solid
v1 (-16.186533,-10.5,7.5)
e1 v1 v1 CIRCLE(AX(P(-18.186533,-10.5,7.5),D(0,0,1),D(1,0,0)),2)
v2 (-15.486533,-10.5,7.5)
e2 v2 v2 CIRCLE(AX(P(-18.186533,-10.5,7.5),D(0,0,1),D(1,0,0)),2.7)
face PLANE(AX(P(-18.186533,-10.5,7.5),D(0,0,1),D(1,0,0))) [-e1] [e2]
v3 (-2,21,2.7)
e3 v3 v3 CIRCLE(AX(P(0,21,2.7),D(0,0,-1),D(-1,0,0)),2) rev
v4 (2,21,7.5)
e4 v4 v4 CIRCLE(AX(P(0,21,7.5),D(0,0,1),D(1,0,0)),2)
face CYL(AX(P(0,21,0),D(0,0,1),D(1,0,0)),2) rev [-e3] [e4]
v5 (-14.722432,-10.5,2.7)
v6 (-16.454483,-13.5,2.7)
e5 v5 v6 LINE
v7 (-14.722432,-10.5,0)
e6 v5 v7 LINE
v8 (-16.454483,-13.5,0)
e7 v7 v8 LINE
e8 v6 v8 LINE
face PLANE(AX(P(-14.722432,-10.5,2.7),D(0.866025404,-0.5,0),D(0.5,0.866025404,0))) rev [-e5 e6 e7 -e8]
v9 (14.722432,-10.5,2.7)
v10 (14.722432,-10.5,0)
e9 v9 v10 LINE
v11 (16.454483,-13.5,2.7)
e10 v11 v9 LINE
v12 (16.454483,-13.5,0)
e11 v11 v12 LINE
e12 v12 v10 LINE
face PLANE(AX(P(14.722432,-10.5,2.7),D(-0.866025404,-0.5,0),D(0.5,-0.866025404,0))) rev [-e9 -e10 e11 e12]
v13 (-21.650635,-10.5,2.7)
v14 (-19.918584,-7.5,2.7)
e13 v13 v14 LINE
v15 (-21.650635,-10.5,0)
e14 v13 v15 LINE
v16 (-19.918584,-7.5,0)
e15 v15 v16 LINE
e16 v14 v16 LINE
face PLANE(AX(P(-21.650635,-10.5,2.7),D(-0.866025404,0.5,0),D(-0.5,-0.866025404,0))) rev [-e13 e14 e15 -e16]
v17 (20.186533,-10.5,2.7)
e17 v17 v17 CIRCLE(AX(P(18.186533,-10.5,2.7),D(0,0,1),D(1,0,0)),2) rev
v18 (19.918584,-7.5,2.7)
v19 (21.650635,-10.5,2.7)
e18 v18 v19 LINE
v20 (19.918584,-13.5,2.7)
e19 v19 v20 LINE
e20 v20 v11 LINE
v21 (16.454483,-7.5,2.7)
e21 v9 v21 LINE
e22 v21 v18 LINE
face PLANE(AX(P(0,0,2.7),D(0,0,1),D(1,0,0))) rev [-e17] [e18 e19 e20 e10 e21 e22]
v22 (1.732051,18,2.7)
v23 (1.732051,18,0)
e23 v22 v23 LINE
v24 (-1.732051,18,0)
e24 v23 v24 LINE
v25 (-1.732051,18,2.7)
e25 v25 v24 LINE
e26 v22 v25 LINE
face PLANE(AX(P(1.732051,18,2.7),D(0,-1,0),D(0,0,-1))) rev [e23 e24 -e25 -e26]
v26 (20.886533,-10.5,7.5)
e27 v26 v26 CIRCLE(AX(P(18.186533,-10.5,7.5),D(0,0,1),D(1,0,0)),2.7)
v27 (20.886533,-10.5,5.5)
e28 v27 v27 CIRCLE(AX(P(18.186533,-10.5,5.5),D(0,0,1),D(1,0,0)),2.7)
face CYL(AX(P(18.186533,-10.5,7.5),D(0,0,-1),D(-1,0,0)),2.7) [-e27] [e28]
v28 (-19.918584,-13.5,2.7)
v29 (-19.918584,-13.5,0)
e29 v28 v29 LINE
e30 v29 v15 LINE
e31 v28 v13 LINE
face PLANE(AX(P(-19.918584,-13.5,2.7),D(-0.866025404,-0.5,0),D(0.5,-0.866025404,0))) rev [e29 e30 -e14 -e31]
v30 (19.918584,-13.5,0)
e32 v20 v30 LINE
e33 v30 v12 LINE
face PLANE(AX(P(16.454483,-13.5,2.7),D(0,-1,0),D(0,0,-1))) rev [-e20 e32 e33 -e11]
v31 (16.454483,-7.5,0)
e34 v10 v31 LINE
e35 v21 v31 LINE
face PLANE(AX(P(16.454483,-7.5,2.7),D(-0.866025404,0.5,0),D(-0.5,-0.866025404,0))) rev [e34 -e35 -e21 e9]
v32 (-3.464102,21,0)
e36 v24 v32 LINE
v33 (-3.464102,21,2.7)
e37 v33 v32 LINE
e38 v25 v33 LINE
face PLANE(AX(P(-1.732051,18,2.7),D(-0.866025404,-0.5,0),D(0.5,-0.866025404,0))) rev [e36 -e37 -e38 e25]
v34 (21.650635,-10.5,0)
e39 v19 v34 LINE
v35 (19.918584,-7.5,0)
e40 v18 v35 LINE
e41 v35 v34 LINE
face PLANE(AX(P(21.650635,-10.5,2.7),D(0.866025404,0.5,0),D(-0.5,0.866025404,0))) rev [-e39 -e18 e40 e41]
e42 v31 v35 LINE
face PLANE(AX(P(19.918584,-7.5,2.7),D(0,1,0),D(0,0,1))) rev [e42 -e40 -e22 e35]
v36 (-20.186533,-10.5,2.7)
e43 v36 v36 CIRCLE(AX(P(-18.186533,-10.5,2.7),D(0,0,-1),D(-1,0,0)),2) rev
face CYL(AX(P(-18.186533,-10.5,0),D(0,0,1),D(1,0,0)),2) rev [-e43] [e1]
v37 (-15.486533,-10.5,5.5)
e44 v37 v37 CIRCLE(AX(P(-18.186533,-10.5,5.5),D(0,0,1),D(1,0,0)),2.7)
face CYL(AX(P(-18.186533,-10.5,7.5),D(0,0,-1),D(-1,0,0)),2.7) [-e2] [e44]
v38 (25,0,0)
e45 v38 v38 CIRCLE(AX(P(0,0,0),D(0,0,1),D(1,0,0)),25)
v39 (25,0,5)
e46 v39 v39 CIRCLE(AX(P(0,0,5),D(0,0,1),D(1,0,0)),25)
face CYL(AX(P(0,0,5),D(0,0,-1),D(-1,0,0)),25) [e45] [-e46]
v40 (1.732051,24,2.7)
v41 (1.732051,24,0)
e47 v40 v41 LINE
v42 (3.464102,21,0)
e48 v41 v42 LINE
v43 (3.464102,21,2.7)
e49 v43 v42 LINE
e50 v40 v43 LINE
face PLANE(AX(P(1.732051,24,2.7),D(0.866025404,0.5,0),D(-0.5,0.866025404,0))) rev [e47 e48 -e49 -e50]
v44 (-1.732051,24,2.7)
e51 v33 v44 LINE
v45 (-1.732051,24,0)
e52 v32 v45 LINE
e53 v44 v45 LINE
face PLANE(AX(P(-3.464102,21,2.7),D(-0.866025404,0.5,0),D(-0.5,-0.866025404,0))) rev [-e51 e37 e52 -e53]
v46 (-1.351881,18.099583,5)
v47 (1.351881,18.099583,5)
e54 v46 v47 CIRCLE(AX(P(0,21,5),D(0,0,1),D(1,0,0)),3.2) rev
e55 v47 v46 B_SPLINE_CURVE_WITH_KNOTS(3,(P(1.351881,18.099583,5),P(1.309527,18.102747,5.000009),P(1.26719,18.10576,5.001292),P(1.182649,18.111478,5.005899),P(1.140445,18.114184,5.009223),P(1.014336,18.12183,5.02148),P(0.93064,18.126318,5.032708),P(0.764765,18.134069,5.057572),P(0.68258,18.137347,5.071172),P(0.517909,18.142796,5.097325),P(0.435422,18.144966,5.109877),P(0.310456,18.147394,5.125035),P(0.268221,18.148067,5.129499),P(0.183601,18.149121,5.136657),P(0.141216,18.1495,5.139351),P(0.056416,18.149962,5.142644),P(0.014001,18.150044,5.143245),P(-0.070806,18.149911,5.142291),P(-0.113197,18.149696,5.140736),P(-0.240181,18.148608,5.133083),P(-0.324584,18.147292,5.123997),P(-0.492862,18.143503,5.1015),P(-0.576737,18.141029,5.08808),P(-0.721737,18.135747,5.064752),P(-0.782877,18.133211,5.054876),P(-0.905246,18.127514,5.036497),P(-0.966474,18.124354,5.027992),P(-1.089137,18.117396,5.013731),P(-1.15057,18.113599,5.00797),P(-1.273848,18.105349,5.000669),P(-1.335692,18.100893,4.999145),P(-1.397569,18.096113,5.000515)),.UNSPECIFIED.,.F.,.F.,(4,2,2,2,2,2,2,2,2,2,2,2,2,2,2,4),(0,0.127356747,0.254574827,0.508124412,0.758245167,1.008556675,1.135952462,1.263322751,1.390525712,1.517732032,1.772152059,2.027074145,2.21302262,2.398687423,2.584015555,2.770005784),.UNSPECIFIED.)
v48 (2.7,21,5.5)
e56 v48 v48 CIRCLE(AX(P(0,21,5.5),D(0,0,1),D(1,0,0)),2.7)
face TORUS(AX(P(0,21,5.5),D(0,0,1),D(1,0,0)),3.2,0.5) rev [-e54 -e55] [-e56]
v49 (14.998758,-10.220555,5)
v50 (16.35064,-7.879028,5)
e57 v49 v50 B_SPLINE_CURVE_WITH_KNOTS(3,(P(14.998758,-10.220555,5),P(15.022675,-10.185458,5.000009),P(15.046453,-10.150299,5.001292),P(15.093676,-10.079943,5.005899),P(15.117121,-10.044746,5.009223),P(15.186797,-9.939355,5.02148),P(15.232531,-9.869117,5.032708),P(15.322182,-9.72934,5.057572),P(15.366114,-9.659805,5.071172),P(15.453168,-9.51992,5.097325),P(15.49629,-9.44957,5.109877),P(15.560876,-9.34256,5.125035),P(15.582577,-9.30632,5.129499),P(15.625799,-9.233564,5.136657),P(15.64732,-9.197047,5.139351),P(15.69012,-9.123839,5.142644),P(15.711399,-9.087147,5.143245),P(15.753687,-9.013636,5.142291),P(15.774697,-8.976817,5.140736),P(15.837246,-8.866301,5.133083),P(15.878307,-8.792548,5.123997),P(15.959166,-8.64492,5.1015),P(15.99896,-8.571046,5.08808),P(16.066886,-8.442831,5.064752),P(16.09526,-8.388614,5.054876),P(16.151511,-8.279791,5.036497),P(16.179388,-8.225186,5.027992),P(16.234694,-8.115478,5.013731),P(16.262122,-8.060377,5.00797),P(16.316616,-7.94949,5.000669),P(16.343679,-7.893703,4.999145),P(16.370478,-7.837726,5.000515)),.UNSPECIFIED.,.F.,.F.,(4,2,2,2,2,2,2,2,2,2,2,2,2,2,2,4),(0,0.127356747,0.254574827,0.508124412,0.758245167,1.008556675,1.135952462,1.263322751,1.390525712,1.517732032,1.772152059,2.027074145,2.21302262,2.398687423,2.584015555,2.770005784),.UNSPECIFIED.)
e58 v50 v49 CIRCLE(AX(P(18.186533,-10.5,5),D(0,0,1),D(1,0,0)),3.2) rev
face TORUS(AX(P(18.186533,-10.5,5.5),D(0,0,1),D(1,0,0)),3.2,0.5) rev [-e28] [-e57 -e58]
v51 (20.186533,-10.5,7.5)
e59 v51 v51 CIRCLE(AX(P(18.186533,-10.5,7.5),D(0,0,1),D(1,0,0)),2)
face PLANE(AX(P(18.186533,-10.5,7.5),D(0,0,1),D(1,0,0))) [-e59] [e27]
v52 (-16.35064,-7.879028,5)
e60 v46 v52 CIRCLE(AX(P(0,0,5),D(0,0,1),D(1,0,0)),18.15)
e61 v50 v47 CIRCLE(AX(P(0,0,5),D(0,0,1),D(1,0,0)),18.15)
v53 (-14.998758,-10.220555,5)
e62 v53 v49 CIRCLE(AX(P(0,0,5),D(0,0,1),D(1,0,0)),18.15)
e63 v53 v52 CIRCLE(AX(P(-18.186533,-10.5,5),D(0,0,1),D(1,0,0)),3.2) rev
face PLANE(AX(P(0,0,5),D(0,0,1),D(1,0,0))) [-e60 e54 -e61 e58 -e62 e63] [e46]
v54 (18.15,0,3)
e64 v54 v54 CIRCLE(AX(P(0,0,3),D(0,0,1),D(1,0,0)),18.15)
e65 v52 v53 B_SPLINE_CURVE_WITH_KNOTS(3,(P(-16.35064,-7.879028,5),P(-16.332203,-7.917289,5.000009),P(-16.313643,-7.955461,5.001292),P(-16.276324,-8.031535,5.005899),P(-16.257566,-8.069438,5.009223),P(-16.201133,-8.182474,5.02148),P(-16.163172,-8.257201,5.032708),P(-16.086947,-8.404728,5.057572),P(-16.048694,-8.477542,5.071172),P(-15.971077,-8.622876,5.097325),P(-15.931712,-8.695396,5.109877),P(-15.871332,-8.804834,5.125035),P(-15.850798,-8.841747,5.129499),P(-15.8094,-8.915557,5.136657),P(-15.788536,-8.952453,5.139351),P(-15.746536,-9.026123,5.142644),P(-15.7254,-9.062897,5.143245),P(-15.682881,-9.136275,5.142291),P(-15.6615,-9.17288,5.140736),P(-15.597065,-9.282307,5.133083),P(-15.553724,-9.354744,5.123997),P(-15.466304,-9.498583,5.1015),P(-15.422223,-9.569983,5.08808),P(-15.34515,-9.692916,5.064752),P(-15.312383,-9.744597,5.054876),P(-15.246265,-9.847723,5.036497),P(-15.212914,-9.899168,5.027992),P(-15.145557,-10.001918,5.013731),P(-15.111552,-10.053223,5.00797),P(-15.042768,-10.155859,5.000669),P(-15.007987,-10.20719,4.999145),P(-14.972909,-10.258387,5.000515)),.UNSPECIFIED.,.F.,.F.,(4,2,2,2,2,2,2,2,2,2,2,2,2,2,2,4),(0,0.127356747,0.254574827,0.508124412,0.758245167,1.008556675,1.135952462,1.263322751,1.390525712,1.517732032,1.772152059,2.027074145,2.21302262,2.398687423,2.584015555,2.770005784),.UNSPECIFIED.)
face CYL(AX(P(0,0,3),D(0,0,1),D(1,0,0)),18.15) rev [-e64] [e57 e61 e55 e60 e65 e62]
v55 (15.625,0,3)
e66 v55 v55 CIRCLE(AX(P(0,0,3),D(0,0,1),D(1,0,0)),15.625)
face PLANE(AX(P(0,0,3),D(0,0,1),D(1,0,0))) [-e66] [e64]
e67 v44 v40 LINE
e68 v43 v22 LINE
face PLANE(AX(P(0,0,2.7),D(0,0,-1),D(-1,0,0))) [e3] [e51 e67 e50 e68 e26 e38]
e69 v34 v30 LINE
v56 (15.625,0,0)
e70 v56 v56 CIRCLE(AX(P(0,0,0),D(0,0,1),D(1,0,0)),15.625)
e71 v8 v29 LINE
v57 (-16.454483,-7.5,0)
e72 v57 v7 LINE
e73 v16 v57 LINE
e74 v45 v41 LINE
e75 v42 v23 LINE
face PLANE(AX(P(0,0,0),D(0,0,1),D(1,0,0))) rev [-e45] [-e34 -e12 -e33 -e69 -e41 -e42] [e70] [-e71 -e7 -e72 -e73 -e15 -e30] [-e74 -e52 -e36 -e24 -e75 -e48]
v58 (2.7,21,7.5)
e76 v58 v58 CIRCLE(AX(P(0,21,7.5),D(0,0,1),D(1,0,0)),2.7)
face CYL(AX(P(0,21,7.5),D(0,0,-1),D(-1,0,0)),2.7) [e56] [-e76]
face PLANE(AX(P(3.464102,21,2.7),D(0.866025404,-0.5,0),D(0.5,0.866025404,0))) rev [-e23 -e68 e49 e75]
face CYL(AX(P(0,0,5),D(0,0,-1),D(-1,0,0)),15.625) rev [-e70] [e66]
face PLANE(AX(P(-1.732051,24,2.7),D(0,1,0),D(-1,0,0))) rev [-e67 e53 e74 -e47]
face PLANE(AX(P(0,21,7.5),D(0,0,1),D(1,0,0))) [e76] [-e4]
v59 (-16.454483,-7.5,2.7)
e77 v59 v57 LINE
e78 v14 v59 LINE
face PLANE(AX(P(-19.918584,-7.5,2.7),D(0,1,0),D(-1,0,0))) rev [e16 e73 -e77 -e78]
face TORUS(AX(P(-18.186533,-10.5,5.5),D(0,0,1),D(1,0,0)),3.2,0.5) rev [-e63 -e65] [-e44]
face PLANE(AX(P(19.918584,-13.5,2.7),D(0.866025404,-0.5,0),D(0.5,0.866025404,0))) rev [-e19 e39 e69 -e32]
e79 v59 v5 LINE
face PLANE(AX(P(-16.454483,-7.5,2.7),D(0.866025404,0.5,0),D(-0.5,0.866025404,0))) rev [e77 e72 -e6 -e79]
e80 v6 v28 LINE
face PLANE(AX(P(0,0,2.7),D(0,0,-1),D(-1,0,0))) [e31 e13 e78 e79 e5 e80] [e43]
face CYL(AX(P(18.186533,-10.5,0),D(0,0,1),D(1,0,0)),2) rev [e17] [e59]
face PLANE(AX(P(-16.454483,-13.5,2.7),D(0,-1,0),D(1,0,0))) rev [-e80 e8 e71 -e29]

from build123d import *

# Parameters (mm, degrees)
SKETCH1_R           = 25
SKETCH1_R_2         = 15.625
BOSS_EXTRUDE1_DEPTH = 5
SKETCH2_R           = 18.15
CUT_EXTRUDE1_DEPTH  = 2
SKETCH3_R           = 2
CUT_EXTRUDE2_DEPTH  = 5
CUT_EXTRUDE3_DEPTH  = 2.7
BOSS_EXTRUDE2_START = 2.5
SKETCH5_R           = 2.7
SKETCH5_R_2         = 2
BOSS_EXTRUDE2_DEPTH = 2.5
FILLET1_R           = 0.5
FILLET2_R           = 0.5
FILLET3_R           = 0.5


with BuildPart() as part:
    # Sketch1 → Boss-Extrude1 (new body)
    with BuildSketch(Plane.XY):
        Circle(SKETCH1_R)
        Circle(SKETCH1_R_2, mode=Mode.SUBTRACT)
    extrude(amount=BOSS_EXTRUDE1_DEPTH)

    # Sketch2 → Cut-Extrude1 (cut)
    with BuildSketch(Plane.XY.offset(5)):
        Circle(SKETCH2_R)
    extrude(amount=-CUT_EXTRUDE1_DEPTH, mode=Mode.SUBTRACT)

    # Sketch3 → Cut-Extrude2 (cut)
    with BuildSketch(Plane.XY.offset(5)):
        with Locations((0, 21)):
            Circle(SKETCH3_R)
        with Locations((-18.186533479, -10.5)):
            Circle(SKETCH3_R)
        with Locations((18.186533479, -10.5)):
            Circle(SKETCH3_R)
    extrude(amount=-CUT_EXTRUDE2_DEPTH, mode=Mode.SUBTRACT)

    # Sketch4 → Cut-Extrude3 (cut)
    with BuildSketch(Plane(origin=(0, 0, 0), x_dir=(-1, 0, 0), z_dir=(0, 0, -1))):
        Polygon((3.464101615, 21), (1.732050808, 24), (-1.732050808, 24), (-3.464101615, 21), (-1.732050808, 18), (1.732050808, 18), align=None)
        Polygon((-16.454482672, -13.5), (-19.918584287, -13.5), (-21.650635095, -10.5), (-19.918584287, -7.5), (-16.454482672, -7.5), (-14.722431864, -10.5), align=None)
        Polygon((19.918584287, -13.5), (21.650635095, -10.5), (19.918584287, -7.5), (16.454482672, -7.5), (14.722431864, -10.5), (16.454482672, -13.5), align=None)
    extrude(amount=-CUT_EXTRUDE3_DEPTH, mode=Mode.SUBTRACT)

    # Sketch5 → Boss-Extrude2 (add)
    # profile 1 of 3: a face of its own
    with BuildSketch(Plane.XY.offset(5).offset(BOSS_EXTRUDE2_START)):
        with Locations((0, 21)):
            Circle(SKETCH5_R)
        with Locations((0, 21)):
            Circle(SKETCH5_R_2, mode=Mode.SUBTRACT)
    # profile 2 of 3: a face of its own
    with BuildSketch(Plane.XY.offset(5).offset(BOSS_EXTRUDE2_START)):
        with Locations((-18.186533479, -10.5)):
            Circle(SKETCH5_R)
        with Locations((-18.186533479, -10.5)):
            Circle(SKETCH5_R_2, mode=Mode.SUBTRACT)
    # profile 3 of 3: a face of its own
    with BuildSketch(Plane.XY.offset(5).offset(BOSS_EXTRUDE2_START)):
        with Locations((18.186533479, -10.5)):
            Circle(SKETCH5_R)
        with Locations((18.186533479, -10.5)):
            Circle(SKETCH5_R_2, mode=Mode.SUBTRACT)
    extrude(amount=-BOSS_EXTRUDE2_DEPTH)

    # Fillet1
    # the kernel refuses this fillet: 0.5 mm, written as the material it adds along each edge
    with BuildSketch(Plane(origin=(-18.186533479, -10.5, 5), x_dir=(1, 0, 0), z_dir=(0, -1, 0))) as fillet1_piece_1_section:
        with BuildLine():
            CenterArc((2.7 + FILLET1_R, FILLET1_R), FILLET1_R, 180, 90)
            Line((2.7, FILLET1_R), (2.7, 0))
            Line((2.7, 0), (2.7 + FILLET1_R, 0))
        make_face()
    fillet1_piece_1 = revolve(axis=Axis((-18.186533479, -10.5, 5), (0, 0, 1)), mode=Mode.PRIVATE)
    fillet1_piece_1 = fillet1_piece_1 - Plane(origin=(0, 0, 5.139143481), x_dir=(1, 0, 0), z_dir=(0, 0, 1)) * Cylinder(18.15, 13, mode=Mode.PRIVATE)
    add(fillet1_piece_1)

    # Fillet2
    # the kernel refuses this fillet: 0.5 mm, written as the material it adds along each edge
    with BuildSketch(Plane(origin=(18.186533479, -10.5, 5), x_dir=(1, 0, 0), z_dir=(0, -1, 0))) as fillet2_piece_1_section:
        with BuildLine():
            CenterArc((2.7 + FILLET2_R, FILLET2_R), FILLET2_R, 180, 90)
            Line((2.7, FILLET2_R), (2.7, 0))
            Line((2.7, 0), (2.7 + FILLET2_R, 0))
        make_face()
    fillet2_piece_1 = revolve(axis=Axis((18.186533479, -10.5, 5), (0, 0, 1)), mode=Mode.PRIVATE)
    fillet2_piece_1 = fillet2_piece_1 - Plane(origin=(0, 0, 5.139143483), x_dir=(1, 0, 0), z_dir=(0, 0, 1)) * Cylinder(18.15, 13, mode=Mode.PRIVATE)
    add(fillet2_piece_1)

    # Fillet3
    # the kernel refuses this fillet: 0.5 mm, written as the material it adds along each edge
    with BuildSketch(Plane(origin=(0, 21, 5), x_dir=(1, 0, 0), z_dir=(0, -1, 0))) as fillet3_piece_1_section:
        with BuildLine():
            CenterArc((2.7 + FILLET3_R, FILLET3_R), FILLET3_R, 180, 90)
            Line((2.7, FILLET3_R), (2.7, 0))
            Line((2.7, 0), (2.7 + FILLET3_R, 0))
        make_face()
    fillet3_piece_1 = revolve(axis=Axis((0, 21, 5), (0, 0, 1)), mode=Mode.PRIVATE)
    fillet3_piece_1 = fillet3_piece_1 - Plane(origin=(0, 0, 5.139143484), x_dir=(1, 0, 0), z_dir=(0, 0, 1)) * Cylinder(18.15, 13, mode=Mode.PRIVATE)
    add(fillet3_piece_1)


solid = part.part
